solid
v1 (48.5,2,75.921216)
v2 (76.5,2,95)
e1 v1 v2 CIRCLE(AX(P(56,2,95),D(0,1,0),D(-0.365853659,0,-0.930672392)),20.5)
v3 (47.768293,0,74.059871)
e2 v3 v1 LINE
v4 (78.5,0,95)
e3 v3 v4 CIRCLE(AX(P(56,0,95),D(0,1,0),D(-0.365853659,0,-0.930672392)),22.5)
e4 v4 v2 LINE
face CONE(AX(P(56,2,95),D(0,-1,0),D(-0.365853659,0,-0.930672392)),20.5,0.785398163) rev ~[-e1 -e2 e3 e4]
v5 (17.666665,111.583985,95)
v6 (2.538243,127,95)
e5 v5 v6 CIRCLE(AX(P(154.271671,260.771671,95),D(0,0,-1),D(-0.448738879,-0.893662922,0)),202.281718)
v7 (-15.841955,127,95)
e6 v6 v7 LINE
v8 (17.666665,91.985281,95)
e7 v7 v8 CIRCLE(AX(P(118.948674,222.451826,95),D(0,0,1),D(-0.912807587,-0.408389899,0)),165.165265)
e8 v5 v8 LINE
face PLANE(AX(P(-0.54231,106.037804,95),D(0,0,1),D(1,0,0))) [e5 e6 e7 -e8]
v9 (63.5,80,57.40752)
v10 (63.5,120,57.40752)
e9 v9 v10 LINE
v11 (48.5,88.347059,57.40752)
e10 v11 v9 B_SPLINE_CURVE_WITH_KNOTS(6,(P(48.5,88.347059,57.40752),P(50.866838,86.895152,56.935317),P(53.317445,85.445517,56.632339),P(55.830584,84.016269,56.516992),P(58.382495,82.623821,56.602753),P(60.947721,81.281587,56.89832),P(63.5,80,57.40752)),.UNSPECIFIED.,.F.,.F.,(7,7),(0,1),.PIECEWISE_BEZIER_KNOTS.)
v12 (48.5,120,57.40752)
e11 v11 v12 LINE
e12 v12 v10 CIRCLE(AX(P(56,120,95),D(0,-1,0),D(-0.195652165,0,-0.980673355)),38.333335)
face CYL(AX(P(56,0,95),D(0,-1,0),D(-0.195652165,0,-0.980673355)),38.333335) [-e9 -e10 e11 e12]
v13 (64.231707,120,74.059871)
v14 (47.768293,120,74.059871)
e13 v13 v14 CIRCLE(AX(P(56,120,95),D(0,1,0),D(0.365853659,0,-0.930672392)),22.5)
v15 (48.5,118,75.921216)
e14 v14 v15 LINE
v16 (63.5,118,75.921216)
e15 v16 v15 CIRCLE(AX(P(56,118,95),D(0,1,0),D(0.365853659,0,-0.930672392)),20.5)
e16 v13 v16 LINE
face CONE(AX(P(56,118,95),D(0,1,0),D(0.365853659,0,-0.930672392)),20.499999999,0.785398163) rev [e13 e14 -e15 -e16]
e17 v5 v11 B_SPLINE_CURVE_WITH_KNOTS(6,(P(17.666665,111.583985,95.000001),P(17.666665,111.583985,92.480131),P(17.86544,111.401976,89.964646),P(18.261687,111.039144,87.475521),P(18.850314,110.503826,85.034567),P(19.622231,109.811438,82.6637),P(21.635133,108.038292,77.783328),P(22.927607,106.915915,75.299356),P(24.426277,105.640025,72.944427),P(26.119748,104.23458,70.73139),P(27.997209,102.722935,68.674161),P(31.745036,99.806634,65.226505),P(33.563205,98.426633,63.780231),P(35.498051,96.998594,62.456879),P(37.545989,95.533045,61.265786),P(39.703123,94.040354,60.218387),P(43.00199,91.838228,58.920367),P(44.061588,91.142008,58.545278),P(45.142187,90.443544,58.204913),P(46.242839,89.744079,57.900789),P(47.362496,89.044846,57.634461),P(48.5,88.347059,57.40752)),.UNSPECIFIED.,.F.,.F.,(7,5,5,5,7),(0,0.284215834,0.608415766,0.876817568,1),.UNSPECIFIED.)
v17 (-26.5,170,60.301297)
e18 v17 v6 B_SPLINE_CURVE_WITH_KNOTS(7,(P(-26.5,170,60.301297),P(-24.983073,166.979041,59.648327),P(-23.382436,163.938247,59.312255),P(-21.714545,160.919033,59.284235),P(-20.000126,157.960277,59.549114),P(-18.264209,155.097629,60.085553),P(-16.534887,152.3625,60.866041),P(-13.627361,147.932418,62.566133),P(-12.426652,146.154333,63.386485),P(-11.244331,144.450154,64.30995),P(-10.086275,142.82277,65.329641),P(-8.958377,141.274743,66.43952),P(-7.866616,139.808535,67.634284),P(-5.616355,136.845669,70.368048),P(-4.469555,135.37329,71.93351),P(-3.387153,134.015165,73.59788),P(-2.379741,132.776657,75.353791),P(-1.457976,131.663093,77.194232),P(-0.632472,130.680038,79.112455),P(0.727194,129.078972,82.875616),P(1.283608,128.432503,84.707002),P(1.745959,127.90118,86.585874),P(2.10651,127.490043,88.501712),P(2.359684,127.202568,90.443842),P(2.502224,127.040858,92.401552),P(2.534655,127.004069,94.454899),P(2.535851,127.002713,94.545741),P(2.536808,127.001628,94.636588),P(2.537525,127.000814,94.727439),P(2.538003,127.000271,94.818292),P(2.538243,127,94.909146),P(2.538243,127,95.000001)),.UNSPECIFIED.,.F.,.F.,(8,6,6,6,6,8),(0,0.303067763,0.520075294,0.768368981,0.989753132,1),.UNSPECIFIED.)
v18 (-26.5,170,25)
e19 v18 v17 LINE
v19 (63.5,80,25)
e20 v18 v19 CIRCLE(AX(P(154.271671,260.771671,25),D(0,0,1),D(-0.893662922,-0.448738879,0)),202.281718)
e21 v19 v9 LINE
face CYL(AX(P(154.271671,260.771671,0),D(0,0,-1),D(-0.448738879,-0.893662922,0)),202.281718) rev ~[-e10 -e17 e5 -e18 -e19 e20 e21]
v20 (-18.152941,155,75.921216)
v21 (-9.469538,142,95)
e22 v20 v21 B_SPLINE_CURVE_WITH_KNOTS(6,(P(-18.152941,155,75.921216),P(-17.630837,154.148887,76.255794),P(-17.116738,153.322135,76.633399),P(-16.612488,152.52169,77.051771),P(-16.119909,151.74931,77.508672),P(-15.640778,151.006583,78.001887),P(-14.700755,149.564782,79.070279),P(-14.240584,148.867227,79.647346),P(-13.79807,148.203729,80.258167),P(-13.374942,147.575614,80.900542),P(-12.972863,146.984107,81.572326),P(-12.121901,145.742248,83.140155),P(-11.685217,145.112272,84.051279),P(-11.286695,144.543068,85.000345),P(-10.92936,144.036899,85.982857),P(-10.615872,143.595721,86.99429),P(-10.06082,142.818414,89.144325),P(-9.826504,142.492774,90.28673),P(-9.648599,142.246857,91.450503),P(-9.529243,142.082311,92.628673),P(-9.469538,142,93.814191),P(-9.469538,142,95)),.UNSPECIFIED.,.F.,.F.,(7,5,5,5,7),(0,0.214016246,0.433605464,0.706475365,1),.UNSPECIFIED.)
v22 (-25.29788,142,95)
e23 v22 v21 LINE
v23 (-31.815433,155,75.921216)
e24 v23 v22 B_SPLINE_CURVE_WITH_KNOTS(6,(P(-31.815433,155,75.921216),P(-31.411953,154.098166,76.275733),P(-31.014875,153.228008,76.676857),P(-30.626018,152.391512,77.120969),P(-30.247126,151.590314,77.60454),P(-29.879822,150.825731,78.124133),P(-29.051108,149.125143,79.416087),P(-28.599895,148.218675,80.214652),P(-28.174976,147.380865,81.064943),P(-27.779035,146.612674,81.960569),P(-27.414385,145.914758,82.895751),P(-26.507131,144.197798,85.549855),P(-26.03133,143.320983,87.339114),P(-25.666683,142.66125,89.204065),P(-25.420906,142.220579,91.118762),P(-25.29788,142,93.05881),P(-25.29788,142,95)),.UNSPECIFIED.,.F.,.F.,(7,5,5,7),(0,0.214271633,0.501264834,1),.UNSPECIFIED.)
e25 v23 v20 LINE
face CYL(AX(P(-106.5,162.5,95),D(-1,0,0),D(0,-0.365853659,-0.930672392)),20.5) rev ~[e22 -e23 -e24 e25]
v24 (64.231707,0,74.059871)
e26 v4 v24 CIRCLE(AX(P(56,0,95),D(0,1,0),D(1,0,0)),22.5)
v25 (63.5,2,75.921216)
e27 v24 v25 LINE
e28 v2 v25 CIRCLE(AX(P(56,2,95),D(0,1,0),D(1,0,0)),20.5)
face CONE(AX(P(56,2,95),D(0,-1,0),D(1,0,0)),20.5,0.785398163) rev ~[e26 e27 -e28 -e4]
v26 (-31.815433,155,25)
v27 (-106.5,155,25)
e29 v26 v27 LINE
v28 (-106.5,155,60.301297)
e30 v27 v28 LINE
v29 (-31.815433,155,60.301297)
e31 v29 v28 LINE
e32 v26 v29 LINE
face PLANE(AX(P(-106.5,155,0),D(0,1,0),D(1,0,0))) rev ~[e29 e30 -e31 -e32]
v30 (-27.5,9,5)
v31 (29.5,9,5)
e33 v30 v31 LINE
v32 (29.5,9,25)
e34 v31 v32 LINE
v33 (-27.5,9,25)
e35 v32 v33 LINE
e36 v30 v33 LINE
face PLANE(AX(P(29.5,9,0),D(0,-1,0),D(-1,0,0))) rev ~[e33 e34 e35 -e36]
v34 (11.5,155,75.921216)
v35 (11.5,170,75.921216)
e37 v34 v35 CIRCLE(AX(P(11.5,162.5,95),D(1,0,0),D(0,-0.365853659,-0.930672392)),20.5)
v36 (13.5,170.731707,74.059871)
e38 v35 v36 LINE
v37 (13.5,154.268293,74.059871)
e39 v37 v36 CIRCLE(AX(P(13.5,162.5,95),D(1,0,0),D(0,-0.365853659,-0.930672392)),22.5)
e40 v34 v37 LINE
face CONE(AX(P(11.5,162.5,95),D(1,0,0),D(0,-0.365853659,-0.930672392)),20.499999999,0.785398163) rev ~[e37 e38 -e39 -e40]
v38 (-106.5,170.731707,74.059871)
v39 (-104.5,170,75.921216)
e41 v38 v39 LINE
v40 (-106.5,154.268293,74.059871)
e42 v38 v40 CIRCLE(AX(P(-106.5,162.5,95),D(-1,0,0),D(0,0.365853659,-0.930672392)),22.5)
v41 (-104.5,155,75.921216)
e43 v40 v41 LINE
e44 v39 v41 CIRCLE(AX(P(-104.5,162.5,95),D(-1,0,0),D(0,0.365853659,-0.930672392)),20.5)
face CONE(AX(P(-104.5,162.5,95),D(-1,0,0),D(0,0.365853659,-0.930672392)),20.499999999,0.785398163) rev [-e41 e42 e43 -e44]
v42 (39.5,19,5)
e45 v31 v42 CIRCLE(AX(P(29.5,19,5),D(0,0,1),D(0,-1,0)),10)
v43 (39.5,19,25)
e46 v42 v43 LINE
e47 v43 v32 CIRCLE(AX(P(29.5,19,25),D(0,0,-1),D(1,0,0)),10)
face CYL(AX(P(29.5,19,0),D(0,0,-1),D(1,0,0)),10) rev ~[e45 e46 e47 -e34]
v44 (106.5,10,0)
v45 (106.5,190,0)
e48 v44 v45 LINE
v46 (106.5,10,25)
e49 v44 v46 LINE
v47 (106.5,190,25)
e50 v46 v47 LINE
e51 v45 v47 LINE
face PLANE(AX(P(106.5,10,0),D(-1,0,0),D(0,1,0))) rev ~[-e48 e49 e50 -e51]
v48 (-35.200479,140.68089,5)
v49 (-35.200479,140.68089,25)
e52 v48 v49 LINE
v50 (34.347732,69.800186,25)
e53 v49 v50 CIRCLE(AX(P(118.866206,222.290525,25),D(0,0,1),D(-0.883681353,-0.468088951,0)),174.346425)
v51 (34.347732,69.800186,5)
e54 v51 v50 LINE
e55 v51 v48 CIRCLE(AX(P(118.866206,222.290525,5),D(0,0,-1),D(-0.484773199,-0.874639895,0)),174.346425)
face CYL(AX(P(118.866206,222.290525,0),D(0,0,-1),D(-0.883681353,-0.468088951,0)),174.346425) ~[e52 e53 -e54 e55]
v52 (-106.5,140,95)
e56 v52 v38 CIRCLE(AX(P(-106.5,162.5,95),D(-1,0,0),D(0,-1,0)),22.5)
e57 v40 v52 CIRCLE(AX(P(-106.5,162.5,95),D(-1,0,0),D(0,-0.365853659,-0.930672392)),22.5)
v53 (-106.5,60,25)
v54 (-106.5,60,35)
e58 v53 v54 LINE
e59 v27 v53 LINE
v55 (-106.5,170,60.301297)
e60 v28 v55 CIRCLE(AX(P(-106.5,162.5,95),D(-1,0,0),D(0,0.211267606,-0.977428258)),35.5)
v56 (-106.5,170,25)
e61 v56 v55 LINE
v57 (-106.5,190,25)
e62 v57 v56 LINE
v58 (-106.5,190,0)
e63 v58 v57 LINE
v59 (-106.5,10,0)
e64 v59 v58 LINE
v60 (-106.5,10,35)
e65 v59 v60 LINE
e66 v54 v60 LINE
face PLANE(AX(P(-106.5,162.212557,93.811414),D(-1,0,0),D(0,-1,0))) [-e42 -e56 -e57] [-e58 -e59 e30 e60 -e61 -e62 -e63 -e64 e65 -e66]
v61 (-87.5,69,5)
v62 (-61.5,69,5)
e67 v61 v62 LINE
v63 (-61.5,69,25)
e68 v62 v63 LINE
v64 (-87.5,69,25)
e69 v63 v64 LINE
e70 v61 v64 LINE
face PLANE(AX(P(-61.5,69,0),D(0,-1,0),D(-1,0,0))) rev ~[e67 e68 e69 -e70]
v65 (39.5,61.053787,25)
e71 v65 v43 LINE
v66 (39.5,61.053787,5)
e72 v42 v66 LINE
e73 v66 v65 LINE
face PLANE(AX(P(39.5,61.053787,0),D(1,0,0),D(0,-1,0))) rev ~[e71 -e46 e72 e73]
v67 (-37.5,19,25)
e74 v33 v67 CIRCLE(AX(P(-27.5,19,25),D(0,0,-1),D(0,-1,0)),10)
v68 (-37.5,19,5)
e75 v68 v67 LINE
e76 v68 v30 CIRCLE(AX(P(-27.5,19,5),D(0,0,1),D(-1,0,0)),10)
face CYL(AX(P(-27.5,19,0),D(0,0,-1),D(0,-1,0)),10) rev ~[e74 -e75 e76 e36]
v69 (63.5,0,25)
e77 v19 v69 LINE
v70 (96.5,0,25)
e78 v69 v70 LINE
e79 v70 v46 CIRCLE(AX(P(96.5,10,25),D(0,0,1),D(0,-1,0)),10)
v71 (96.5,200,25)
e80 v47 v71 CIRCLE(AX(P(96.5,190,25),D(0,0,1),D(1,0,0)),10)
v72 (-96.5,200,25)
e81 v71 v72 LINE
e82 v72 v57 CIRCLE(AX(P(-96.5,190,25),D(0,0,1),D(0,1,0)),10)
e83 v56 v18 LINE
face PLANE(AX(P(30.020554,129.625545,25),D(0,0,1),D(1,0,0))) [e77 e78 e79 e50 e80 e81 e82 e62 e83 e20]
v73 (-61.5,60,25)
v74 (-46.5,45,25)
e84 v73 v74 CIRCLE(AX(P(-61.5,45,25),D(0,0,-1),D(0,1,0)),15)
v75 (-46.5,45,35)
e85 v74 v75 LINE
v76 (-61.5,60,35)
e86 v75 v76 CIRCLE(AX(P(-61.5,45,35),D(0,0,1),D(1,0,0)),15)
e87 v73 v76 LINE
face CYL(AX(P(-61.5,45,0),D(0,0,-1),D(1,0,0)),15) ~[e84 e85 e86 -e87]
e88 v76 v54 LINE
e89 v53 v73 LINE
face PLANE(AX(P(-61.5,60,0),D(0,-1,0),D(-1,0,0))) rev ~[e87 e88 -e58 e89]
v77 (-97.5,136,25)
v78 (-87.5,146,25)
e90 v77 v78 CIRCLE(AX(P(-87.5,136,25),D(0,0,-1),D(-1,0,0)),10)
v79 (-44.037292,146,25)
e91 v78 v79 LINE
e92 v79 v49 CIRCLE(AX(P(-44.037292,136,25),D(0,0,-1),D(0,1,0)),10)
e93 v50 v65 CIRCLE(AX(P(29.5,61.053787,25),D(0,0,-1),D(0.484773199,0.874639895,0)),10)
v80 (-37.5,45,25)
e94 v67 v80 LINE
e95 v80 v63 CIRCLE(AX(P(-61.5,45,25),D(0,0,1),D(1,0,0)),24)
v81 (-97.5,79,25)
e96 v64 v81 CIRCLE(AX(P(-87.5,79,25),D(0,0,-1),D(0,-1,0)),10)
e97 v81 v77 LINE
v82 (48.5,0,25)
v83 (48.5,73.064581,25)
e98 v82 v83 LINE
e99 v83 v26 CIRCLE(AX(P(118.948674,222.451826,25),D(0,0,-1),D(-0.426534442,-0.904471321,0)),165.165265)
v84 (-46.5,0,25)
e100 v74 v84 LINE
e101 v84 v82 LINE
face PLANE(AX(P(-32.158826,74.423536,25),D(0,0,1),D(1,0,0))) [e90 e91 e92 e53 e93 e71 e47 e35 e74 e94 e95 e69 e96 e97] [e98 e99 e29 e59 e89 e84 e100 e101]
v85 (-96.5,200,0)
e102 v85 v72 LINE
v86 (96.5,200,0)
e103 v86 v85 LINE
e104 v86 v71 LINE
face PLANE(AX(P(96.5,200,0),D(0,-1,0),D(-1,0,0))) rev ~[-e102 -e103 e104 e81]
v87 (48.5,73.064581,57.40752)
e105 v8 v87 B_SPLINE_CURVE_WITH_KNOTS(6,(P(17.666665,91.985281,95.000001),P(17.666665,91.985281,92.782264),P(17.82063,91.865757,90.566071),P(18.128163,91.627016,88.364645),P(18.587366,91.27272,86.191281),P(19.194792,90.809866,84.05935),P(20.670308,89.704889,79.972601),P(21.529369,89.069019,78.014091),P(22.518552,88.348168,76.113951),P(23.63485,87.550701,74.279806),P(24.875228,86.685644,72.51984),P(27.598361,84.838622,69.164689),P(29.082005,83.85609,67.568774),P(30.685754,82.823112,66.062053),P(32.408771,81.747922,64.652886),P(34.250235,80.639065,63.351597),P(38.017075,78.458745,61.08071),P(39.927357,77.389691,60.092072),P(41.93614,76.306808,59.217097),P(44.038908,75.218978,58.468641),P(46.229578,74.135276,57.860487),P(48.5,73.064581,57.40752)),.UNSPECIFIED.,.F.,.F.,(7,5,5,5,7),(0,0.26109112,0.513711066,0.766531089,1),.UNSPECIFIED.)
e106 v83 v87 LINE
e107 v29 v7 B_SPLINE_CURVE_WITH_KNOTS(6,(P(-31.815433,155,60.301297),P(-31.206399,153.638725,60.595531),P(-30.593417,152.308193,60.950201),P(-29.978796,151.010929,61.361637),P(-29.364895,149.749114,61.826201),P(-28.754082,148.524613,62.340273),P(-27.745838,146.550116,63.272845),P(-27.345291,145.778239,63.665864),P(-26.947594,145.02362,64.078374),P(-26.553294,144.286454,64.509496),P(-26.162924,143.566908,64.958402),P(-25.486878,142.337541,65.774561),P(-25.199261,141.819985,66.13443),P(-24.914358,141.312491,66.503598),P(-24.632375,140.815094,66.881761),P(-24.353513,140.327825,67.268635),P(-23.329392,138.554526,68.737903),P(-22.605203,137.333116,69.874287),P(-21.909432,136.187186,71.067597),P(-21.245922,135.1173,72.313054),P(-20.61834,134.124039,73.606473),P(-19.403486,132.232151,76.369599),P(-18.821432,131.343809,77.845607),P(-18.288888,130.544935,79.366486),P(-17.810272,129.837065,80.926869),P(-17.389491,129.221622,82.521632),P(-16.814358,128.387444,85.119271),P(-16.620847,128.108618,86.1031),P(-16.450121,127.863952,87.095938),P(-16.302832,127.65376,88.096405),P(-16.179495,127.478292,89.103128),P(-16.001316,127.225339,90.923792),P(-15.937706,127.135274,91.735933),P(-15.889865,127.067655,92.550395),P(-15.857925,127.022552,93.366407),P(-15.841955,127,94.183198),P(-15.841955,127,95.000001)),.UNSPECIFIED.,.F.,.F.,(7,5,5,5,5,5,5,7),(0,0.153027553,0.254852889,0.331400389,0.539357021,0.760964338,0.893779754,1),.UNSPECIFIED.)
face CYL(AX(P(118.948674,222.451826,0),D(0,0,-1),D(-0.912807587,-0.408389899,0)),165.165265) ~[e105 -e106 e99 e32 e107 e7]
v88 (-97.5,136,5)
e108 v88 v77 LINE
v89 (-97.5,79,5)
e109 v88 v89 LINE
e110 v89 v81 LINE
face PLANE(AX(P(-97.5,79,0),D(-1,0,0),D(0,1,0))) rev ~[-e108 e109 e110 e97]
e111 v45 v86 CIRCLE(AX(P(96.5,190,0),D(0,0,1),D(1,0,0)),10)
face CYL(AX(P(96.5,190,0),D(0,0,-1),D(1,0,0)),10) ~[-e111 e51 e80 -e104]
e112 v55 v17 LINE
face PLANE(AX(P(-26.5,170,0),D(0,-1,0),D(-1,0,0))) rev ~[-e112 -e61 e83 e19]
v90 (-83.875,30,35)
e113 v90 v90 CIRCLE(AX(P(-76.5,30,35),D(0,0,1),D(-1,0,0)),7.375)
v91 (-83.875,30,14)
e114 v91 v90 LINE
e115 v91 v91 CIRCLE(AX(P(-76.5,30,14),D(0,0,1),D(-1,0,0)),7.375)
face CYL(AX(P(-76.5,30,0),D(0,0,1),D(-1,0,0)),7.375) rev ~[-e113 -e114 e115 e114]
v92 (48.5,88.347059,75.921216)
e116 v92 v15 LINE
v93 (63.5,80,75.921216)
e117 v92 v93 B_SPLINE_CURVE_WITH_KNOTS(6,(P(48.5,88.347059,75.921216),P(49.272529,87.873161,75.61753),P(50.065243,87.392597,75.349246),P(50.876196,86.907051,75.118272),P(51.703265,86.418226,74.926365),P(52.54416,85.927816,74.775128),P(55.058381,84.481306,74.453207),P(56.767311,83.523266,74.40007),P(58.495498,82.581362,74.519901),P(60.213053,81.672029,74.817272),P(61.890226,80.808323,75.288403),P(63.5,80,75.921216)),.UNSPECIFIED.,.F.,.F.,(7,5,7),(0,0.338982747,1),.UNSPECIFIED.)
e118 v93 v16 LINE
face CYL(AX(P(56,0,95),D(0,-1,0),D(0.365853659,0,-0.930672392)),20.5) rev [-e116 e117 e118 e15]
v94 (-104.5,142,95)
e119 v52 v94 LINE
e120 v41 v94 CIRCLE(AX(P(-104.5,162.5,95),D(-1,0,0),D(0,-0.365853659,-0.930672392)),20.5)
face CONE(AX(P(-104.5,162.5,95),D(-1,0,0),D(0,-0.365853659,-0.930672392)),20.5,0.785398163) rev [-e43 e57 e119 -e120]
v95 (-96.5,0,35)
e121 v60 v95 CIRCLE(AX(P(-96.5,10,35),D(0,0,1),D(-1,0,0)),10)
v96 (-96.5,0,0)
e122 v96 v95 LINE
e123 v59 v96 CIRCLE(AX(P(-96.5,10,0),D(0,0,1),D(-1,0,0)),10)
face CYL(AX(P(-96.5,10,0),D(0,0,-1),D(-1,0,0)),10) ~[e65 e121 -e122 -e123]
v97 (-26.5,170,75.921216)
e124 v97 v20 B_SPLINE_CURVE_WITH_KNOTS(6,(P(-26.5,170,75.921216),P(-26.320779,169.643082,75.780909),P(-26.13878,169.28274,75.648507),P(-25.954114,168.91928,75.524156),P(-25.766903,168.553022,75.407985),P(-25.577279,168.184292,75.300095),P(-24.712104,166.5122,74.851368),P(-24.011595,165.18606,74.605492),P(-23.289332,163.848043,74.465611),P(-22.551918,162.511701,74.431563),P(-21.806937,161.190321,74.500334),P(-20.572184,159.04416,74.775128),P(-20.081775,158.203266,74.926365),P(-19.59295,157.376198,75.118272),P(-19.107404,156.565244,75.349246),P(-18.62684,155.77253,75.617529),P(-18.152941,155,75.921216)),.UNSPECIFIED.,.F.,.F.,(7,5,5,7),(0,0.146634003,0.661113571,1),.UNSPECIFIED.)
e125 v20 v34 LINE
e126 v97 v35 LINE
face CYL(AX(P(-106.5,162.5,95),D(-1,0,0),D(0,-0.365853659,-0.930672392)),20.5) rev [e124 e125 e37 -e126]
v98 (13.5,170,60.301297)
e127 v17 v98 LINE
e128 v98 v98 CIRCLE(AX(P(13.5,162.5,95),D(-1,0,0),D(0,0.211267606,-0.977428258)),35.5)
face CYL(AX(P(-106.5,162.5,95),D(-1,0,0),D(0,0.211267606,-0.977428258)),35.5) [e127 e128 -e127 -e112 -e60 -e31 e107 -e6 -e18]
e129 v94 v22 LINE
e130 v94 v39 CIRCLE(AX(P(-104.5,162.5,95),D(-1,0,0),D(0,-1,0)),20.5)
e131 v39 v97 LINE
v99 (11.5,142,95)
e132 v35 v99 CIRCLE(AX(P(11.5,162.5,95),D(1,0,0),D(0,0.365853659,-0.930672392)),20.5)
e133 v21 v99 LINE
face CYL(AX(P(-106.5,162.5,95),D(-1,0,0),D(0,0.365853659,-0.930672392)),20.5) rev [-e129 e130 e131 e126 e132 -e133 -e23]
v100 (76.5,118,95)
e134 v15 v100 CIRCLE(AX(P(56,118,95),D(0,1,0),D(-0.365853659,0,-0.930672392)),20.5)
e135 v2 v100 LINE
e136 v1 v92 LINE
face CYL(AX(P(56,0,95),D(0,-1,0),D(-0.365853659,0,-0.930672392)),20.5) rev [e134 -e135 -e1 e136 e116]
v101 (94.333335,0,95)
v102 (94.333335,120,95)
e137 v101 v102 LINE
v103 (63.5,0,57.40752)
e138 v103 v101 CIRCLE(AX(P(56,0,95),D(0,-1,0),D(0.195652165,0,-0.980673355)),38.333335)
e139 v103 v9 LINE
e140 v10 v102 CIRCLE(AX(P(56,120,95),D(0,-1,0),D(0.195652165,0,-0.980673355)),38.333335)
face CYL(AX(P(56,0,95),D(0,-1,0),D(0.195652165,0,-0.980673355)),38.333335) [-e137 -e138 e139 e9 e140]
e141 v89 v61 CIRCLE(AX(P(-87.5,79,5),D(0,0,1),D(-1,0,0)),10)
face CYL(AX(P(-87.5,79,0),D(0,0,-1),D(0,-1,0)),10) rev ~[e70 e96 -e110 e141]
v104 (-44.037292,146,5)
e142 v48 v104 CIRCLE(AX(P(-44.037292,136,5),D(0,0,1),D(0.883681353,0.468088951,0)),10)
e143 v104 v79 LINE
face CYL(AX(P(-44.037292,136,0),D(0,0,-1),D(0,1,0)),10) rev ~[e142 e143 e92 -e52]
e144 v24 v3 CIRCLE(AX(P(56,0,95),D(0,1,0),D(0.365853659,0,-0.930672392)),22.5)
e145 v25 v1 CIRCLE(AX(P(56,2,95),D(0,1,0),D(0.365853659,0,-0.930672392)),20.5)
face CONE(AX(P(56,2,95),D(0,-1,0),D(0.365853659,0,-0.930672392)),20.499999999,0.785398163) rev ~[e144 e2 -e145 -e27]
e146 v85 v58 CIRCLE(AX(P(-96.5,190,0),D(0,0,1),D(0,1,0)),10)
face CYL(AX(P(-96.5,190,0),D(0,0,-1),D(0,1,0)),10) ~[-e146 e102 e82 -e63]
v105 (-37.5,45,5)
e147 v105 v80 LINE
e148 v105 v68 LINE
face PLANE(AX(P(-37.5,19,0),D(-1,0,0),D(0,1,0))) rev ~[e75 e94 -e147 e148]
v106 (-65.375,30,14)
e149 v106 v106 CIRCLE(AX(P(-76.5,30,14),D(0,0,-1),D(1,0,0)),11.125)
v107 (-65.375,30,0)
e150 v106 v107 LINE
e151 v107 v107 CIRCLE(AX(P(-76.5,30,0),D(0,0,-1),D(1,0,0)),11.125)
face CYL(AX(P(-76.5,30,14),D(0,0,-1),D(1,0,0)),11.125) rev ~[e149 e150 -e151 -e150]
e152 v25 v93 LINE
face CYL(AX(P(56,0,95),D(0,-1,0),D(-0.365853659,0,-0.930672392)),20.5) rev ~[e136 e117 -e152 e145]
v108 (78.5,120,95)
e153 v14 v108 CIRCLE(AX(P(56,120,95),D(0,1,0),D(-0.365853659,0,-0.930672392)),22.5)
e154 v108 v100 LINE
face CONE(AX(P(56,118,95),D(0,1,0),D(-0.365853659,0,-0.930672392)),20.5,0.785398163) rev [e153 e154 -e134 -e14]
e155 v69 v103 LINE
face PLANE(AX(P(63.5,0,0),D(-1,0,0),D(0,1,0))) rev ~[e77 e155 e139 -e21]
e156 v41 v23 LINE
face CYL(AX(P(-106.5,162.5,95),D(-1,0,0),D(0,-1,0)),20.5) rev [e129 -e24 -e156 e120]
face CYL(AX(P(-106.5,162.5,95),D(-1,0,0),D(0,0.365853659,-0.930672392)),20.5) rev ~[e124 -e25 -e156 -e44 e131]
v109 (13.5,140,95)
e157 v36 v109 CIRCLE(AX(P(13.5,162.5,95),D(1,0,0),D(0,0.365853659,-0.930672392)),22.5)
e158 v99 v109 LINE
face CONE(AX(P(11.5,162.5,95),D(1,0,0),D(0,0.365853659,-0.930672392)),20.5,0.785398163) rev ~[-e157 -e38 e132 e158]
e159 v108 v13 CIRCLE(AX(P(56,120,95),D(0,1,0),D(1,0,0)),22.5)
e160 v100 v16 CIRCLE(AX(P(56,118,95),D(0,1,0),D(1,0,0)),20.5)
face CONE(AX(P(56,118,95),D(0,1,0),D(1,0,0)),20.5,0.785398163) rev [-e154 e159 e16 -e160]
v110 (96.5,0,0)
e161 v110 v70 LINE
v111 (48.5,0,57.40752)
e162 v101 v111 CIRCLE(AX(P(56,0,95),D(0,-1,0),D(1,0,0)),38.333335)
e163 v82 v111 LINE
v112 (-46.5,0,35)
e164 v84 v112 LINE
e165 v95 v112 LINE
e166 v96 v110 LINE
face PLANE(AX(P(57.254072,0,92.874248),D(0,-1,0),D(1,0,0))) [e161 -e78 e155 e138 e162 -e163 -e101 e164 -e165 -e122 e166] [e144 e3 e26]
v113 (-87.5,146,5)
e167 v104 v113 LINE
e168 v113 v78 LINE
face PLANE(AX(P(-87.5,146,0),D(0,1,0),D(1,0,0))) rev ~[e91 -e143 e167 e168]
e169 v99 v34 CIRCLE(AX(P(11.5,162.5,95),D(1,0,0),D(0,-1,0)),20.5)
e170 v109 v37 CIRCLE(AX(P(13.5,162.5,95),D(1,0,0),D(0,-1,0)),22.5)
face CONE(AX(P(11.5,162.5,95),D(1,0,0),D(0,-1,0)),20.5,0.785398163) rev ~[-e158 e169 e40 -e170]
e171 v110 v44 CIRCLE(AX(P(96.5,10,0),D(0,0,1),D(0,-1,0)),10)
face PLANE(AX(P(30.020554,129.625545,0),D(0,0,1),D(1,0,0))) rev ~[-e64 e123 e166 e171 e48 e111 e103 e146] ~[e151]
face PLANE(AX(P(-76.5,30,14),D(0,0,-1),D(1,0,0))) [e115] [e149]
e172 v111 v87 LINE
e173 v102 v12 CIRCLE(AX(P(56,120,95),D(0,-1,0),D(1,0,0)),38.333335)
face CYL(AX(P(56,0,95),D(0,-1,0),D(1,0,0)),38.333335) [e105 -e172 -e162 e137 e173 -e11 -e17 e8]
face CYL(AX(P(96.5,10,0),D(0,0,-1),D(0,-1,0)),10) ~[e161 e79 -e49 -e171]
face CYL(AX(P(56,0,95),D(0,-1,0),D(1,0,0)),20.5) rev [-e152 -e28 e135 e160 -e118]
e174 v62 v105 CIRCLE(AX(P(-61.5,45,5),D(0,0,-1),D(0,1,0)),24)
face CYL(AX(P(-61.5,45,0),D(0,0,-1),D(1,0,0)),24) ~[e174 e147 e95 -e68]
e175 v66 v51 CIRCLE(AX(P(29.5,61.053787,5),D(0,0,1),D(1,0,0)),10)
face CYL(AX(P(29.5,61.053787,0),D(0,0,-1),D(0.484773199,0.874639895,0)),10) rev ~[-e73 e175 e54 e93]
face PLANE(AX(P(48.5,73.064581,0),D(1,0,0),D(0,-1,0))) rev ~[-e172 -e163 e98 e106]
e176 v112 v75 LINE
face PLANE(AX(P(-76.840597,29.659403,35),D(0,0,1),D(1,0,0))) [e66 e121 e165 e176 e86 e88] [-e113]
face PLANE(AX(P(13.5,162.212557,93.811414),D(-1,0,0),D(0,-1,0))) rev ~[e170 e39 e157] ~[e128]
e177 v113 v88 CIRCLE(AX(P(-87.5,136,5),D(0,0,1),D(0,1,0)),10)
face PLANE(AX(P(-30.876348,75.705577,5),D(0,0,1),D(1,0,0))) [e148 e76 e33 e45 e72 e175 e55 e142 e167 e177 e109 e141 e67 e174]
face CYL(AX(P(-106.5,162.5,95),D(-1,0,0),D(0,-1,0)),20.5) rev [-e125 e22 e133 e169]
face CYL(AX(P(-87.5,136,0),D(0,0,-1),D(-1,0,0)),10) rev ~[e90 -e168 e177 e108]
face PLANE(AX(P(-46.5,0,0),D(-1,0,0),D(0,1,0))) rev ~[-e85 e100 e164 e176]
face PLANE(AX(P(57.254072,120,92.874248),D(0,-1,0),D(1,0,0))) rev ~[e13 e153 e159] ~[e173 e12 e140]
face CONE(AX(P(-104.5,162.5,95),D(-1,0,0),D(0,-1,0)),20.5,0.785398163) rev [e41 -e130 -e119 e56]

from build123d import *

# Parameters (mm, degrees)
F1_DEPTH       = 35
F2_DEPTH       = 25
F3_DEPTH       = 5
F4_DEPTH       = 95
F5_D           = 14.75
F5_CBORE_D     = 22.25
F5_CBORE_DEPTH = 14
F6_DEPTH       = 25
F8_DEPTH       = 120
F9_DEPTH       = 120
F11_DEPTH      = 120
F12_DEPTH      = 120
F13_SIZE       = 2


with BuildPart() as f1:
    # F0 (on Top) → F1 (new body)
    with BuildSketch(Plane.XY):
        with BuildLine():
            ThreePointArc((-106.5, 10), (-103.5710678119, 2.9289321881), (-96.5, 0))
            Line((-96.5, 0), (-46.5, 0))
            Line((-46.5, 0), (-46.5, 45))
            ThreePointArc((-46.5, 45), (-50.8933982822, 55.6066017178), (-61.5, 60))
            Line((-61.5, 60), (-106.5, 60))
            Line((-106.5, 60), (-106.5, 10))
        make_face()
    extrude(amount=F1_DEPTH)

    # F0 (on Top) → F2 (join)
    with BuildSketch(Plane.XY):
        with BuildLine():
            Line((-46.5, 45), (-46.5, 0))
            Line((-46.5, 0), (48.5, 0))
            Line((48.5, 0), (48.5, 9))
            Line((48.5, 9), (48.5, 73.0645805597))
            ThreePointArc((48.5, 73.0645805597), (0.9989947663, 106.8341893096), (-31.8154327598, 155))
            Line((-31.8154327598, 155), (-106.5, 155))
            Line((-106.5, 155), (-106.5, 60))
            Line((-106.5, 60), (-61.5, 60))
            ThreePointArc((-61.5, 60), (-50.8933982822, 55.6066017178), (-46.5, 45))
        make_face()
        with BuildLine():
            Line((-61.5, 69), (-87.5, 69))
            ThreePointArc((-87.5, 69), (-94.5710678119, 71.9289321881), (-97.5, 79))
            Line((-97.5, 79), (-97.5, 136))
            ThreePointArc((-97.5, 136), (-94.5710678119, 143.0710678119), (-87.5, 146))
            Line((-87.5, 146), (-44.0372922197, 146))
            ThreePointArc((-44.0372922197, 146), (-38.8802046252, 144.5676395548), (-35.2004786871, 140.6808895084))
            ThreePointArc((-35.2004786871, 140.6808895084), (-5.5795172138, 100.1842682312), (34.3477319863, 69.8001858066))
            ThreePointArc((34.3477319863, 69.8001858066), (38.1161859272, 66.1293498865), (39.5, 61.0537868568))
            Line((39.5, 61.0537868568), (39.5, 19))
            ThreePointArc((39.5, 19), (36.5710678119, 11.9289321881), (29.5, 9))
            Line((29.5, 9), (-27.5, 9))
            ThreePointArc((-27.5, 9), (-34.5710678119, 11.9289321881), (-37.5, 19))
            Line((-37.5, 19), (-37.5, 45))
            ThreePointArc((-37.5, 45), (-44.5294372515, 61.9705627485), (-61.5, 69))
        make_face(mode=Mode.SUBTRACT)
    extrude(amount=F2_DEPTH)

    # F0 (on Top) → F3 (join)
    with BuildSketch(Plane.XY):
        with BuildLine():
            ThreePointArc((-97.5, 79), (-94.5710678119, 71.9289321881), (-87.5, 69))
            Line((-87.5, 69), (-61.5, 69))
            ThreePointArc((-61.5, 69), (-44.5294372515, 61.9705627485), (-37.5, 45))
            Line((-37.5, 45), (-37.5, 19))
            ThreePointArc((-37.5, 19), (-34.5710678119, 11.9289321881), (-27.5, 9))
            Line((-27.5, 9), (29.5, 9))
            ThreePointArc((29.5, 9), (36.5710678119, 11.9289321881), (39.5, 19))
            Line((39.5, 19), (39.5, 61.0537868568))
            ThreePointArc((39.5, 61.0537868568), (38.1161859272, 66.1293498865), (34.3477319863, 69.8001858066))
            ThreePointArc((34.3477319863, 69.8001858066), (-5.5795172138, 100.1842682312), (-35.2004786871, 140.6808895084))
            ThreePointArc((-35.2004786871, 140.6808895084), (-38.8802046252, 144.5676395548), (-44.0372922197, 146))
            Line((-44.0372922197, 146), (-87.5, 146))
            ThreePointArc((-87.5, 146), (-94.5710678119, 143.0710678119), (-97.5, 136))
            Line((-97.5, 136), (-97.5, 79))
        make_face()
    extrude(amount=F3_DEPTH)

    # F0 (on Top) → F4 (join)
    with BuildSketch(Plane.XY):
        with BuildLine():
            Line((48.5, 9), (48.5, 0))
            Line((48.5, 0), (63.5, 0))
            Line((63.5, 0), (63.5, 80))
            ThreePointArc((63.5, 80), (11.2368967619, 117.7368967619), (-26.5, 170))
            Line((-26.5, 170), (-106.5, 170))
            Line((-106.5, 170), (-106.5, 155))
            Line((-106.5, 155), (-31.8154327598, 155))
            ThreePointArc((-31.8154327598, 155), (0.9989947663, 106.8341893096), (48.5, 73.0645805597))
            Line((48.5, 73.0645805597), (48.5, 9))
        make_face()
    extrude(amount=F4_DEPTH)

    # F5 (through all)
    with Locations(Plane(origin=(0, 0, 0), x_dir=(1, 0, 0), z_dir=(0, 0, -1))):
        with Locations((-76.5, -30)):
            CounterBoreHole(F5_D / 2, F5_CBORE_D / 2, F5_CBORE_DEPTH)

    # F0 (on Top) → F6 (join)
    with BuildSketch(Plane.XY):
        with BuildLine():
            Line((63.5, 80), (63.5, 0))
            Line((63.5, 0), (96.5, 0))
            ThreePointArc((96.5, 0), (103.5710678119, 2.9289321881), (106.5, 10))
            Line((106.5, 10), (106.5, 190))
            ThreePointArc((106.5, 190), (103.5710678119, 197.0710678119), (96.5, 200))
            Line((96.5, 200), (-96.5, 200))
            ThreePointArc((-96.5, 200), (-103.5710678119, 197.0710678119), (-106.5, 190))
            Line((-106.5, 190), (-106.5, 170))
            Line((-106.5, 170), (-26.5, 170))
            ThreePointArc((-26.5, 170), (11.2368967619, 117.7368967619), (63.5, 80))
        make_face()
    extrude(amount=F6_DEPTH)

    # F7 (on face) → F8 (cut)
    with BuildSketch(Plane.XZ):
        with BuildLine():
            Line((48.5, 75.9212159717), (48.5, 95))
            Line((48.5, 95), (63.5, 95))
            Line((63.5, 95), (63.5, 75.9212159717))
            ThreePointArc((63.5, 75.9212159717), (72.9410743461, 83.4566036194), (76.5, 95))
            ThreePointArc((76.5, 95), (44.4566036194, 111.9410743461), (48.5, 75.9212159717))
        make_face()
        with BuildLine():
            Line((63.5, 95), (48.5, 95))
            Line((48.5, 95), (48.5, 75.9212159717))
            ThreePointArc((48.5, 75.9212159717), (56, 74.5), (63.5, 75.9212159717))
            Line((63.5, 75.9212159717), (63.5, 95))
        make_face()
    extrude(amount=-F8_DEPTH, mode=Mode.SUBTRACT)

    # F7 (on face) → F9 (join)
    with BuildSketch(Plane.XZ):
        with BuildLine():
            Line((48.5, 57.4075197384), (48.5, 75.9212159717))
            ThreePointArc((48.5, 75.9212159717), (44.4566036194, 111.9410743461), (76.5, 95))
            ThreePointArc((76.5, 95), (72.9410743461, 83.4566036194), (63.5, 75.9212159717))
            Line((63.5, 75.9212159717), (63.5, 57.4075197384))
            ThreePointArc((63.5, 57.4075197384), (85.6390332562, 70.6900785715), (94.333335, 95))
            ThreePointArc((94.333335, 95), (31.6900785715, 124.6390332562), (48.5, 57.4075197384))
        make_face()
        with BuildLine():
            ThreePointArc((63.5, 75.9212159717), (56, 74.5), (48.5, 75.9212159717))
            Line((48.5, 75.9212159717), (48.5, 57.4075197384))
            ThreePointArc((48.5, 57.4075197384), (56, 56.666665), (63.5, 57.4075197384))
            Line((63.5, 57.4075197384), (63.5, 75.9212159717))
        make_face()
    extrude(amount=-F9_DEPTH)

    # F10 (on face) → F11 (cut)
    with BuildSketch(Plane(origin=(-106.5, 0, 0), x_dir=(0, -1, 0), z_dir=(-1, 0, 0))):
        with BuildLine():
            Line((-170, 95), (-155, 95))
            Line((-155, 95), (-155, 75.9212159717))
            ThreePointArc((-155, 75.9212159717), (-145.5589256539, 83.4566036194), (-142, 95))
            ThreePointArc((-142, 95), (-174.0433963806, 111.9410743461), (-170, 75.9212159717))
            Line((-170, 75.9212159717), (-170, 95))
        make_face()
        with BuildLine():
            Line((-155, 75.9212159717), (-155, 95))
            Line((-155, 95), (-170, 95))
            Line((-170, 95), (-170, 75.9212159717))
            ThreePointArc((-170, 75.9212159717), (-162.5, 74.5), (-155, 75.9212159717))
        make_face()
    extrude(amount=-F11_DEPTH, mode=Mode.SUBTRACT)

    # F10 (on face) → F12 (join)
    with BuildSketch(Plane(origin=(-106.5, 0, 0), x_dir=(0, -1, 0), z_dir=(-1, 0, 0))):
        with BuildLine():
            ThreePointArc((-142, 95), (-145.5589256539, 83.4566036194), (-155, 75.9212159717))
            Line((-155, 75.9212159717), (-155, 60.3012968542))
            ThreePointArc((-155, 60.3012968542), (-134.8730204329, 72.7065031904), (-127, 95))
            ThreePointArc((-127, 95), (-184.7934968096, 122.6269795671), (-170, 60.3012968542))
            Line((-170, 60.3012968542), (-170, 75.9212159717))
            ThreePointArc((-170, 75.9212159717), (-174.0433963806, 111.9410743461), (-142, 95))
        make_face()
        with BuildLine():
            Line((-155, 60.3012968542), (-155, 75.9212159717))
            ThreePointArc((-155, 75.9212159717), (-162.5, 74.5), (-170, 75.9212159717))
            Line((-170, 75.9212159717), (-170, 60.3012968542))
            ThreePointArc((-170, 60.3012968542), (-162.5, 59.5), (-155, 60.3012968542))
        make_face()
    extrude(amount=-F12_DEPTH)

    # F13
    f13_edges = [f1.edges().sort_by_distance(p)[0] for p in [
        (35.5, 0, 95),
        (35.5, 120, 95),
        (13.5, 183, 95),
        (-106.5, 162.5, 74.5),
        (-106.5, 145.558926, 83.456604),
        (-106.5, 174.043396, 111.941074),
    ]]
    chamfer(f13_edges, length=F13_SIZE)


solid = f1.part
